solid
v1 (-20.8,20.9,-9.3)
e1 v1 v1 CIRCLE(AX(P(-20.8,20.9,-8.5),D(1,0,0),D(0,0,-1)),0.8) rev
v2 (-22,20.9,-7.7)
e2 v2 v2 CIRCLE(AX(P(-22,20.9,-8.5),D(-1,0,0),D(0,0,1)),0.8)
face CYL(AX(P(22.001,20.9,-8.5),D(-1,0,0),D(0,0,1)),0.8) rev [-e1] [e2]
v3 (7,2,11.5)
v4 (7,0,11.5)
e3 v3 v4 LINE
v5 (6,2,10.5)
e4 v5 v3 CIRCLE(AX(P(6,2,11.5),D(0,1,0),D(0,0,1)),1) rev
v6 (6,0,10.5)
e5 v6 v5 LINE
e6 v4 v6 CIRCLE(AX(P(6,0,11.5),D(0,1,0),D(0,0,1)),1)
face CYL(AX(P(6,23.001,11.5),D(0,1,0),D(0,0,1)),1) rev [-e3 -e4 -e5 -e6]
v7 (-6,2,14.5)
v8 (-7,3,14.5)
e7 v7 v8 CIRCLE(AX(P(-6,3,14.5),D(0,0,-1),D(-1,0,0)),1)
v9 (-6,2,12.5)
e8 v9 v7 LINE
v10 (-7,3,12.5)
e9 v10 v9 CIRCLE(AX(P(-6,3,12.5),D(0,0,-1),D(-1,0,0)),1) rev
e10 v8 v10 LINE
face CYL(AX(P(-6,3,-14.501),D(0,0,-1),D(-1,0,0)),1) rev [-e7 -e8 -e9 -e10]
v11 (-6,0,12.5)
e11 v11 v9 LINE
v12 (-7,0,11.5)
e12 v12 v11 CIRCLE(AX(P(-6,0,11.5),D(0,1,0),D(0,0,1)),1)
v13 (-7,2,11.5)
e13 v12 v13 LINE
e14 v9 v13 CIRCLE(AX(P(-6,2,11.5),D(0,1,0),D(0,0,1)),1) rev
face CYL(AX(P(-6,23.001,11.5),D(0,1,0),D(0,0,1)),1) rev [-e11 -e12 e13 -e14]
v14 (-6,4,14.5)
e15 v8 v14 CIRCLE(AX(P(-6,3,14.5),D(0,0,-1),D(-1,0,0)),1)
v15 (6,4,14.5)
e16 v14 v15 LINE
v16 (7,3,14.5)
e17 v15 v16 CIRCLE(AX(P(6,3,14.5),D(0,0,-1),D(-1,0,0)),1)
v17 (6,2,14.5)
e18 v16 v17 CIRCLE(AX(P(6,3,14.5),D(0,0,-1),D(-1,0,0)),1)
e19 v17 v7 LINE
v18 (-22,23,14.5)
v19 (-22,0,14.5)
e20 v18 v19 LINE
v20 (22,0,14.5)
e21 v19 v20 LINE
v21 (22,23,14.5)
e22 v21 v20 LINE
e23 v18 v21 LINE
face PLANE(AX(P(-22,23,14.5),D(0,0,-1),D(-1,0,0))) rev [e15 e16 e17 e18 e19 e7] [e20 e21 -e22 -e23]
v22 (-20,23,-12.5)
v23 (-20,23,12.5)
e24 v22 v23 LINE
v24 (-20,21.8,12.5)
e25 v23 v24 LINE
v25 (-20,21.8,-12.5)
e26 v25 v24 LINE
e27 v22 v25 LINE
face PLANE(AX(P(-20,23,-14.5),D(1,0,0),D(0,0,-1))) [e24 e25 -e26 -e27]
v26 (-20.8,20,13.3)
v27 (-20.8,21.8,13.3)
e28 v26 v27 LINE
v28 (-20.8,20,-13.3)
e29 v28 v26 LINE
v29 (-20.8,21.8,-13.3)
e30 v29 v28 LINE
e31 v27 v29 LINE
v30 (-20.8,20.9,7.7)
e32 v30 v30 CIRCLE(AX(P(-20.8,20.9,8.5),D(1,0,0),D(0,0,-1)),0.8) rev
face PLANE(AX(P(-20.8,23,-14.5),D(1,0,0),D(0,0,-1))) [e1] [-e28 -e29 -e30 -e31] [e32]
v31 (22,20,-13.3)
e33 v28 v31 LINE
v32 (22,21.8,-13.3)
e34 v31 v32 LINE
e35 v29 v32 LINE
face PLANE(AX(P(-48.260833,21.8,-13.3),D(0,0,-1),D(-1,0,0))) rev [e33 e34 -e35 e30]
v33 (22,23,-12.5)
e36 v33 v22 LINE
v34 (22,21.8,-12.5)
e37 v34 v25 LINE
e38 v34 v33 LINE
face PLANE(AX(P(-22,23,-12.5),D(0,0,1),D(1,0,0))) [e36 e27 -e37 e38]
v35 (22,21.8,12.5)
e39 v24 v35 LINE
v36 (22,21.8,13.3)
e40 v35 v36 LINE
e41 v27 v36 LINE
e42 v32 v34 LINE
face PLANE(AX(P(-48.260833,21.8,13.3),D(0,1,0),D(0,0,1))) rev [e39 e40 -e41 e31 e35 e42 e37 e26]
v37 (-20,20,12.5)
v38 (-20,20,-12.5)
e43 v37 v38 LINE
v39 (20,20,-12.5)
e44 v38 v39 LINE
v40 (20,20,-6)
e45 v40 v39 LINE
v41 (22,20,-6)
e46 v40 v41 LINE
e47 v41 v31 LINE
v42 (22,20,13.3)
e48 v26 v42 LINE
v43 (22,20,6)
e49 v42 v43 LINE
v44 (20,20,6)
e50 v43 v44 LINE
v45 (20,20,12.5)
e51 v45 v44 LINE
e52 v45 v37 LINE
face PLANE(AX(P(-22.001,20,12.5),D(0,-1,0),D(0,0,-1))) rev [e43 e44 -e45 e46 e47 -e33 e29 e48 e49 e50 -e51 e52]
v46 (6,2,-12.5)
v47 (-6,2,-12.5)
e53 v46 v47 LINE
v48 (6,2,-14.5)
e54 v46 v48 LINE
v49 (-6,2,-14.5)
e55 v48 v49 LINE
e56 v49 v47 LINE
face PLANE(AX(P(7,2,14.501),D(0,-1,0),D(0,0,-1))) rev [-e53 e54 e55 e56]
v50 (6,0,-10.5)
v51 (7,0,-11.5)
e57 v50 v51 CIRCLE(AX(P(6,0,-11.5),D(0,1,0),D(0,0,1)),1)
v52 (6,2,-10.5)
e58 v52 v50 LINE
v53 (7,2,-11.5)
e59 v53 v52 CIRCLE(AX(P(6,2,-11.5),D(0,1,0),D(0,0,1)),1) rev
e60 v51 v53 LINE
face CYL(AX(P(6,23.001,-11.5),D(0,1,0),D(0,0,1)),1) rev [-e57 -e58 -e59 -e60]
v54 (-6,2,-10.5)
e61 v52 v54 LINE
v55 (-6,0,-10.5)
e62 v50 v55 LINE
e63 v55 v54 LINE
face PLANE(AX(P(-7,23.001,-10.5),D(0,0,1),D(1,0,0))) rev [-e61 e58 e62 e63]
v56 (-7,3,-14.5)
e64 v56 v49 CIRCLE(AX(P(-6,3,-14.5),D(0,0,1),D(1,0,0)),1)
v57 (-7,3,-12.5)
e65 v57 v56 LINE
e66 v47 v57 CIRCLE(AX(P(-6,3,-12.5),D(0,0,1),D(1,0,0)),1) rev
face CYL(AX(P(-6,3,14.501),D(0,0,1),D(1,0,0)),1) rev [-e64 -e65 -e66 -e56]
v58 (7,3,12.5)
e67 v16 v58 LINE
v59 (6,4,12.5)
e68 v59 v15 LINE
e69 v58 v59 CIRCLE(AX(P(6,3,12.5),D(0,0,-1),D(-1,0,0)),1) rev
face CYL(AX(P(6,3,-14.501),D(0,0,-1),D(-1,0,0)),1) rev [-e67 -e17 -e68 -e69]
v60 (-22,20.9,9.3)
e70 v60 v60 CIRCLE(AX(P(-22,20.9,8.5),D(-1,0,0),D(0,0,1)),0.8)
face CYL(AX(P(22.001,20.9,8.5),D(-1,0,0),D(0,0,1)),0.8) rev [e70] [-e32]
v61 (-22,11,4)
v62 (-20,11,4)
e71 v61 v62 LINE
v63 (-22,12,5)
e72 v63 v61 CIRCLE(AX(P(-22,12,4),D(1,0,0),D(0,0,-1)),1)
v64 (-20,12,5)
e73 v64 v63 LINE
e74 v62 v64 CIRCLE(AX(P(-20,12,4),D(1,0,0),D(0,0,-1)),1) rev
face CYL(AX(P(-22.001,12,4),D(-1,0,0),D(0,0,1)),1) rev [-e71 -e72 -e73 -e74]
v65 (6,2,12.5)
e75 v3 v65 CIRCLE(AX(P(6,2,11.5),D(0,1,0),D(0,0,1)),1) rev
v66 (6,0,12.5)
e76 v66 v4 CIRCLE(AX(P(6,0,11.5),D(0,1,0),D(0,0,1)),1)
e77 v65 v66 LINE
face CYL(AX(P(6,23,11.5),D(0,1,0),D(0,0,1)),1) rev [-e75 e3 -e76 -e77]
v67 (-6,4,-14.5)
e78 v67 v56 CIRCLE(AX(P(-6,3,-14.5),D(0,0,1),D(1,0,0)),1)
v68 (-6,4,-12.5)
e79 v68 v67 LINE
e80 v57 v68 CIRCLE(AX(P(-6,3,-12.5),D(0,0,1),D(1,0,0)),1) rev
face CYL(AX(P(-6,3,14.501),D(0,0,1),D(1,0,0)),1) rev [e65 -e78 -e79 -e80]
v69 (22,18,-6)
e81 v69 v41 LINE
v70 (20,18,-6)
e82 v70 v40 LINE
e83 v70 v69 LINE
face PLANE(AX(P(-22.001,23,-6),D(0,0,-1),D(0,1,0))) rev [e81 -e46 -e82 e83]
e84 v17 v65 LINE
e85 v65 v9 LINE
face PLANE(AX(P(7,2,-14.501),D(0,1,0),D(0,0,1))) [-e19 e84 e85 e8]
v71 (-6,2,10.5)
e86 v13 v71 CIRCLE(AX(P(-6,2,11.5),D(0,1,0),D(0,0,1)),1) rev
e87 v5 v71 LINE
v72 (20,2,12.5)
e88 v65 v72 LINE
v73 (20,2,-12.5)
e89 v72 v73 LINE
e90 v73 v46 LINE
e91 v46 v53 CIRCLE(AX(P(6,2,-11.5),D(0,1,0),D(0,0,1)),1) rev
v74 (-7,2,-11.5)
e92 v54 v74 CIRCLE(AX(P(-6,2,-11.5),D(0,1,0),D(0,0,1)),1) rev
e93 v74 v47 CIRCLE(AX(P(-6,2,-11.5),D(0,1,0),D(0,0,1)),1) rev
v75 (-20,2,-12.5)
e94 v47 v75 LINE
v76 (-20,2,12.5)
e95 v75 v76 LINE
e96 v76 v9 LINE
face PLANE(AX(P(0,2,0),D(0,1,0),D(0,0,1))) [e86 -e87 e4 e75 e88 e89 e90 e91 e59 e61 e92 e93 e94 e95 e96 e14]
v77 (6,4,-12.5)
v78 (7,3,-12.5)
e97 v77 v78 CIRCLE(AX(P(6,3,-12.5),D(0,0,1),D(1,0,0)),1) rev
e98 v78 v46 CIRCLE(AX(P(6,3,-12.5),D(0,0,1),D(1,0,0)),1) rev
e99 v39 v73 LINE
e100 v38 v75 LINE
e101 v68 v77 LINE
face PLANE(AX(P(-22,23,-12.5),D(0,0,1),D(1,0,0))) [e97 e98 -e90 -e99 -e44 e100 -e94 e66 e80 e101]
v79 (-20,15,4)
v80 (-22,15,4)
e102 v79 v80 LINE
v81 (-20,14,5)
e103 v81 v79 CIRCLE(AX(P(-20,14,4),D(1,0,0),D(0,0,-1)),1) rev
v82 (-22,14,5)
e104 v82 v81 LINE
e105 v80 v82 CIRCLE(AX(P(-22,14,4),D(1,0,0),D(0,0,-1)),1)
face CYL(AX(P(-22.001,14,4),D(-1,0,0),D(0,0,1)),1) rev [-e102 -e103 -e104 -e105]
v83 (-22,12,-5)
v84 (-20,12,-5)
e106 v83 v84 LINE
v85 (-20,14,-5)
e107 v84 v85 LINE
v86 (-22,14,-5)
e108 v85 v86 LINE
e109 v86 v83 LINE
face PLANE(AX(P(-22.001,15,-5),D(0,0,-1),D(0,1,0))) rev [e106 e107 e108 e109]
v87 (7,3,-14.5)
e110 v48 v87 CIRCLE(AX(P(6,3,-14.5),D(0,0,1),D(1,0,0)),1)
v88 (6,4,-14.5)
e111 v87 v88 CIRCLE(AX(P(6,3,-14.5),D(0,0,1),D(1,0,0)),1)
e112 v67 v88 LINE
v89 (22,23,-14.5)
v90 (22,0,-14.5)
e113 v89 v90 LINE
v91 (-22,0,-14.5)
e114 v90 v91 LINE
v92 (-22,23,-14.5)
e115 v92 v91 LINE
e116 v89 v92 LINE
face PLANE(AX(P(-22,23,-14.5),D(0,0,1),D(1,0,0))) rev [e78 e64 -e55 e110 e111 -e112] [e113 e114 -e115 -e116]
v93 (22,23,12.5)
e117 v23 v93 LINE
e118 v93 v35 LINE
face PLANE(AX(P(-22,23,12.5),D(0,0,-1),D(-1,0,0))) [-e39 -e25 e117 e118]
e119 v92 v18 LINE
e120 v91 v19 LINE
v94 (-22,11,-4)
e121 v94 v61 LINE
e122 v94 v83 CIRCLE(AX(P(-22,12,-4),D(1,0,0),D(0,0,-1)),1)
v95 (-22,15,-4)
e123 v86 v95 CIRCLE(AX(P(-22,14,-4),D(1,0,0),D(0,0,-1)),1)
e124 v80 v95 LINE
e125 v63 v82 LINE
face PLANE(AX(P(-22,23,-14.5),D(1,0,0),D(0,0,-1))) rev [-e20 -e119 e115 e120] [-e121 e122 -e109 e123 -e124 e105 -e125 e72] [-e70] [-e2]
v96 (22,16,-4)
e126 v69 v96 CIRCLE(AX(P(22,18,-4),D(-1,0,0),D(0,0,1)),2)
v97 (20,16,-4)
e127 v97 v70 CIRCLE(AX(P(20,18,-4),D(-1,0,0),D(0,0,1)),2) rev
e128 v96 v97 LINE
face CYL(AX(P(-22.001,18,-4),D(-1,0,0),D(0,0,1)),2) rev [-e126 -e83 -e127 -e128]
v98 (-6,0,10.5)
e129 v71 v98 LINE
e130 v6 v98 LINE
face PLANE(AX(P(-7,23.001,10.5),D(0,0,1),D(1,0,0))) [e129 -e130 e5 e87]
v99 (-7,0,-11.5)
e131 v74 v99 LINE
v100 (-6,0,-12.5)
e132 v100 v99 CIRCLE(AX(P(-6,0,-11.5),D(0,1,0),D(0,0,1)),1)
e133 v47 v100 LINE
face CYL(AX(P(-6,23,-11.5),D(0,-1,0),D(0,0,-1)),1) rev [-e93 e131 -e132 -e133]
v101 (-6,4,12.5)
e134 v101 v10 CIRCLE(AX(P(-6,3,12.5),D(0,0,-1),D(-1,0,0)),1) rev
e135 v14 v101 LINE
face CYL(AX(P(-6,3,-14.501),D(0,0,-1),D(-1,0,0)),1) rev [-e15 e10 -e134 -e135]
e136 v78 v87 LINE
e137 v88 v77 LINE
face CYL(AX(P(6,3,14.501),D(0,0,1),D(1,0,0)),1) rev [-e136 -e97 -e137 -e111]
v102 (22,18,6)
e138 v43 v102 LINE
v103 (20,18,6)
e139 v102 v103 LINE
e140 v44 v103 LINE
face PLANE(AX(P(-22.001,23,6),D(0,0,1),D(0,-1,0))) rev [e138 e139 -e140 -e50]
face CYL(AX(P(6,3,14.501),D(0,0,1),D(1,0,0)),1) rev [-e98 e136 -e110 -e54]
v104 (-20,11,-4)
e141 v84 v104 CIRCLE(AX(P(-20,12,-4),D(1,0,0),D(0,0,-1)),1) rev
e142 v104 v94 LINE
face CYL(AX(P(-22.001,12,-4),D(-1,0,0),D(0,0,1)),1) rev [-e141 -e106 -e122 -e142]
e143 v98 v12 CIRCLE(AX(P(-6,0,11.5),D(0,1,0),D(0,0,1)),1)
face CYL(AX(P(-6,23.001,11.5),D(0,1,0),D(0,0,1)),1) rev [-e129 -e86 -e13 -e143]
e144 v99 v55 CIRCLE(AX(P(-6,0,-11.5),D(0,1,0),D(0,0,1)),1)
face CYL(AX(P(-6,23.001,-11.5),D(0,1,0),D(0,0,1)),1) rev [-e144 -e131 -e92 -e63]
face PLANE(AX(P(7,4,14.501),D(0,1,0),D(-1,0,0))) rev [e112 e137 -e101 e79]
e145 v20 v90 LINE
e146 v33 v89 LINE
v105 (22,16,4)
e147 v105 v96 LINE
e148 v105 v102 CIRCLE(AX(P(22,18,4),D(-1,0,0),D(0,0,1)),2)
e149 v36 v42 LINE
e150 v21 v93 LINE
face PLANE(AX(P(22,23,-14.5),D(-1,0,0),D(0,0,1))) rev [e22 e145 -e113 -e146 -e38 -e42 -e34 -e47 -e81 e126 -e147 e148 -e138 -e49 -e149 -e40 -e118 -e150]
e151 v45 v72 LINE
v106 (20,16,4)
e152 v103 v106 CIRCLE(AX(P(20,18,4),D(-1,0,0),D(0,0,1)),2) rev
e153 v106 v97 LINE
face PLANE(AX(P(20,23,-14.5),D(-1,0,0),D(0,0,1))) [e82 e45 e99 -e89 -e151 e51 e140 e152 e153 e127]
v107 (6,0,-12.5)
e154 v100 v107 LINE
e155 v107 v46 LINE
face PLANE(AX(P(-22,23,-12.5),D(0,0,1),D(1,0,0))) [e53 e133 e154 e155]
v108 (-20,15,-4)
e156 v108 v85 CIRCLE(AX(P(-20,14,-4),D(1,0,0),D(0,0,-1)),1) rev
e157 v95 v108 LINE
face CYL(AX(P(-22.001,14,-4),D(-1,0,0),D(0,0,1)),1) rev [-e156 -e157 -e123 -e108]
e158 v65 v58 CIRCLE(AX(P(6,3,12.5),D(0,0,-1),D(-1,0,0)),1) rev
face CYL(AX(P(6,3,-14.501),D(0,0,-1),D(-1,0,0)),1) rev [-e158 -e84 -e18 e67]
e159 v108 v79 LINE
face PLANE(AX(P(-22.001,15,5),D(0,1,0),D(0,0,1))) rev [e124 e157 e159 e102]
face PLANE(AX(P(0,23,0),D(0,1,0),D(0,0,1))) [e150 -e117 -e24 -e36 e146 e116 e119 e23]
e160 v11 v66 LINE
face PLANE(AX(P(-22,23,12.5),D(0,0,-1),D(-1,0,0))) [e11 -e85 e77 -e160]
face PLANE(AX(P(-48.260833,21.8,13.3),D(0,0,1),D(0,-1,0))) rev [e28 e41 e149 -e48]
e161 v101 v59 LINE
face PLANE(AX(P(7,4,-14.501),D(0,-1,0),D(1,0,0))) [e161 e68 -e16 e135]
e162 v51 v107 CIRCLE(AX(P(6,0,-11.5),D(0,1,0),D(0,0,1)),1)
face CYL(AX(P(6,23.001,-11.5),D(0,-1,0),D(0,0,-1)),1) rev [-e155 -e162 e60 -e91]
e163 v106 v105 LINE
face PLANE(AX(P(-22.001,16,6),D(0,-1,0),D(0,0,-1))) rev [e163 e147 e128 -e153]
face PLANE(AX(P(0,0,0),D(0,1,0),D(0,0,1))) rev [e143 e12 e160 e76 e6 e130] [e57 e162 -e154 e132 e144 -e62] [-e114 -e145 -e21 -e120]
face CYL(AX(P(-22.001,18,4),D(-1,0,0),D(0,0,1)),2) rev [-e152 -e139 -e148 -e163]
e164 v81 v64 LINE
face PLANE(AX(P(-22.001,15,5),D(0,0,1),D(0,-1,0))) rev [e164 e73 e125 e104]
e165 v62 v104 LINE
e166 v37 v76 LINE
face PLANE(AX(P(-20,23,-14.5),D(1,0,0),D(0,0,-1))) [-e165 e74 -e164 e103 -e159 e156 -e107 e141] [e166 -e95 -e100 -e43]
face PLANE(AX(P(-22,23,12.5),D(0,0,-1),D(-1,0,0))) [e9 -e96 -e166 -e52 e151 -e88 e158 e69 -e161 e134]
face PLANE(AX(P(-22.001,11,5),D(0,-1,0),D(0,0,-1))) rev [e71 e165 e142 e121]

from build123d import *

# Parameters (mm, degrees)
SKETCH_1_W             = 44
SKETCH_1_H             = 29
EXTRUDE_1_DEPTH        = 23
SHELL_1_T              = -2
CUT_EXTRUDE_1_REACH    = 53.723
SKETCH_2_W             = 12
SKETCH_2_H             = 7
CUT_EXTRUDE_2_REACH    = 52.032
SKETCH_3_W             = 10
SKETCH_3_H             = 4
FILLET_1_R             = 1
FILLET_2_R             = 2
CUT_EXTRUDE_START      = -2
SKETCH_4_W             = 25
SKETCH_4_H             = 3
CUT_EXTRUDE_3_DEPTH    = 2
SKETCH_5_W             = 26.6
SKETCH_5_H             = 1.8
CUT_EXTRUDE_4_DEPTH    = 42.8
CUT_EXTRUDE_5_REACH    = 53.723
SKETCH_6_R             = 0.8
CUT_EXTRUDE_6_REACH    = 36.975
SKETCH_8_W             = 14
SKETCH_8_H             = 2
CUT_EXTRUDE_7_REACH    = 45.058
SKETCH_9_W             = 14
SKETCH_9_H             = 2
FILLET_3_R             = 1
FILLET_4_R             = 1
FILLET_3_OF_MIRROR_1_R = 1
FILLET_4_OF_MIRROR_1_R = 1


# Some blends are built 0.0001 mm under size
with BuildPart() as part:
    # 草图1 → 凸台-拉伸1 (new body)
    with BuildSketch(Plane(origin=(0, 0, 0), x_dir=(1, 0, 0), z_dir=(0, 1, 0))):
        Rectangle(SKETCH_1_W, SKETCH_1_H)
    extrude(amount=EXTRUDE_1_DEPTH)

    # 抽壳1
    shell_1_openings = [part.faces().sort_by_distance(p)[0] for p in [
        (0, 23, 0),
    ]]
    offset(amount=SHELL_1_T, openings=shell_1_openings, kind=Kind.INTERSECTION)

    # 草图2 → 切除-拉伸1 (cut, up to next)
    with BuildSketch(Plane(origin=(22, 0, 0), x_dir=(0, 0, -1), z_dir=(1, 0, 0)), mode=Mode.PRIVATE) as cut_extrude_1_sk1:
        with Locations((0, 19.5)):
            Rectangle(SKETCH_2_W, SKETCH_2_H)
    cut_extrude_1_tool1 = extrude(cut_extrude_1_sk1.sketch, amount=-CUT_EXTRUDE_1_REACH, mode=Mode.PRIVATE) & part.part
    add(cut_extrude_1_tool1.solids().sort_by_distance((22, 19.5, 0))[0], mode=Mode.SUBTRACT)

    # 草图3 → 切除-拉伸2 (cut, up to next)
    with BuildSketch(Plane(origin=(-20, 0, 0), x_dir=(0, 0, -1), z_dir=(1, 0, 0)), mode=Mode.PRIVATE) as cut_extrude_2_sk1:
        with Locations((0, 13)):
            Rectangle(SKETCH_3_W, SKETCH_3_H)
    cut_extrude_2_tool1 = extrude(cut_extrude_2_sk1.sketch, amount=-CUT_EXTRUDE_2_REACH, mode=Mode.PRIVATE) & part.part
    add(cut_extrude_2_tool1.solids().sort_by_distance((-20, 13, 0))[0], mode=Mode.SUBTRACT)

    # 圆角1
    fillet_1_edges = [part.edges().sort_by_distance(p)[0] for p in [
        (-21, 11, 5),
        (-21, 15, 5),
        (-21, 15, -5),
        (-21, 11, -5),
    ]]
    fillet(fillet_1_edges, radius=FILLET_1_R)

    # 圆角2
    fillet_2_edges = [part.edges().sort_by_distance(p)[0] for p in [
        (21, 16, 6),
        (21, 16, -6),
    ]]
    fillet(fillet_2_edges, radius=FILLET_2_R)

    # 草图4 → 切除-拉伸3 (cut)
    with BuildSketch(Plane(origin=(22, 0, 0), x_dir=(0, 0, -1), z_dir=(1, 0, 0)).offset(CUT_EXTRUDE_START)):
        with Locations((0, 21.5)):
            Rectangle(SKETCH_4_W, SKETCH_4_H)
    extrude(amount=CUT_EXTRUDE_3_DEPTH, mode=Mode.SUBTRACT)

    # 草图5 → 切除-拉伸4 (cut)
    with BuildSketch(Plane(origin=(22, 0, 0), x_dir=(0, 0, -1), z_dir=(1, 0, 0))):
        with Locations((0, 20.9)):
            Rectangle(SKETCH_5_W, SKETCH_5_H)
    extrude(amount=-CUT_EXTRUDE_4_DEPTH, mode=Mode.SUBTRACT)

    # 草图6 → 切除-拉伸5 (cut, up to next)
    with BuildSketch(Plane.ZY.offset(22), mode=Mode.PRIVATE) as cut_extrude_5_sk1:
        with Locations((-8.5, 20.9)):
            Circle(SKETCH_6_R)
    cut_extrude_5_tool1 = extrude(cut_extrude_5_sk1.sketch, amount=-CUT_EXTRUDE_5_REACH, mode=Mode.PRIVATE) & part.part
    # 草图6 → 切除-拉伸5 (cut, up to next)
    with BuildSketch(Plane.ZY.offset(22), mode=Mode.PRIVATE) as cut_extrude_5_sk2:
        with Locations((8.5, 20.9)):
            Circle(SKETCH_6_R)
    cut_extrude_5_tool2 = extrude(cut_extrude_5_sk2.sketch, amount=-CUT_EXTRUDE_5_REACH, mode=Mode.PRIVATE) & part.part
    add(cut_extrude_5_tool1.solids().sort_by_distance((-22, 20.9, -8.5))[0], mode=Mode.SUBTRACT)
    add(cut_extrude_5_tool2.solids().sort_by_distance((-22, 20.9, 8.5))[0], mode=Mode.SUBTRACT)

    # 草图8 → 切除-拉伸6 (cut, up to next)
    with BuildSketch(Plane.XZ, mode=Mode.PRIVATE) as cut_extrude_6_sk1:
        with Locations((0, -11.5)):
            Rectangle(SKETCH_8_W, SKETCH_8_H)
    cut_extrude_6_tool1 = extrude(cut_extrude_6_sk1.sketch, amount=-CUT_EXTRUDE_6_REACH, mode=Mode.PRIVATE) & part.part
    cut_extrude_6 = cut_extrude_6_tool1.solids().sort_by_distance((0, 0, -11.5))[0]
    add(cut_extrude_6, mode=Mode.SUBTRACT)

    # 草图9 → 切除-拉伸7 (cut, up to next)
    with BuildSketch(Plane(origin=(0, 0, -14.5), x_dir=(-1, 0, 0), z_dir=(0, 0, -1)), mode=Mode.PRIVATE) as cut_extrude_7_sk1:
        with Locations((0, 3)):
            Rectangle(SKETCH_9_W, SKETCH_9_H)
    cut_extrude_7_tool1 = extrude(cut_extrude_7_sk1.sketch, amount=-CUT_EXTRUDE_7_REACH, mode=Mode.PRIVATE) & part.part
    cut_extrude_7 = cut_extrude_7_tool1.solids().sort_by_distance((0, 3, -14.5))[0]
    add(cut_extrude_7, mode=Mode.SUBTRACT)

    # 圆角3
    # the kernel refuses this fillet: 1 mm, written as the material it adds along each edge
    with BuildSketch(Plane(origin=(-7, 4, -14.5), x_dir=(0, -1, 0), z_dir=(0, 0, 1)), Plane(origin=(-7, 2, -14.5), x_dir=(1, 0, 0), z_dir=(0, 0, 1)), Plane(origin=(7, 2, -14.5), x_dir=(0, 1, 0), z_dir=(0, 0, 1))) as fillet_3_piece_1:
        with BuildLine():
            CenterArc((FILLET_3_R, FILLET_3_R), FILLET_3_R, 180, 90)
            Line((0, FILLET_3_R), (0, 0))
            Line((0, 0), (FILLET_3_R, 0))
        make_face()
    extrude(amount=2)
    with BuildSketch(Plane(origin=(7, 4, -14.5), x_dir=(0, -1, 0), z_dir=(0, 0, 1))) as fillet_3_piece_2:
        with BuildLine():
            CenterArc((FILLET_3_R, -FILLET_3_R), FILLET_3_R, 90, 90)
            Line((0, -FILLET_3_R), (0, 0))
            Line((0, 0), (FILLET_3_R, 0))
        make_face()
    extrude(amount=2)

    # 圆角4
    fillet_4_edges = [part.edges().sort_by_distance(p)[0] for p in [
        (-7, 1, -12.5),
        (-7, 1, -10.5),
        (7, 1, -12.5),
        (7, 1, -10.5),
    ]]
    fillet(fillet_4_edges, radius=FILLET_4_R - 0.0001)  # a hair under: the kernel refuses the full size

    # 镜向1: 切除-拉伸6, 切除-拉伸7 across plane
    add(cut_extrude_6.mirror(Plane.XY), mode=Mode.SUBTRACT)
    add(cut_extrude_7.mirror(Plane.XY), mode=Mode.SUBTRACT)

    # 圆角3 of 镜向1
    # the kernel refuses this fillet: 1 mm, written as the material it adds along each edge
    with BuildSketch(Plane(origin=(-7, 4, 14.5), x_dir=(1, 0, 0), z_dir=(0, 0, -1)), Plane(origin=(-7, 2, 14.5), x_dir=(0, 1, 0), z_dir=(0, 0, -1)), Plane(origin=(7, 2, 14.5), x_dir=(-1, 0, 0), z_dir=(0, 0, -1))) as fillet_3_of_mirror_1_piece_1:
        with BuildLine():
            CenterArc((FILLET_3_OF_MIRROR_1_R, FILLET_3_OF_MIRROR_1_R), FILLET_3_OF_MIRROR_1_R, 180, 90)
            Line((0, FILLET_3_OF_MIRROR_1_R), (0, 0))
            Line((0, 0), (FILLET_3_OF_MIRROR_1_R, 0))
        make_face()
    extrude(amount=2)
    with BuildSketch(Plane(origin=(7, 4, 14.5), x_dir=(-1, 0, 0), z_dir=(0, 0, -1))) as fillet_3_of_mirror_1_piece_2:
        with BuildLine():
            CenterArc((FILLET_3_OF_MIRROR_1_R, -FILLET_3_OF_MIRROR_1_R), FILLET_3_OF_MIRROR_1_R, 90, 90)
            Line((0, -FILLET_3_OF_MIRROR_1_R), (0, 0))
            Line((0, 0), (FILLET_3_OF_MIRROR_1_R, 0))
        make_face()
    extrude(amount=2)

    # 圆角4 of 镜向1
    fillet_4_of_mirror_1_edges = [part.edges().sort_by_distance(p)[0] for p in [
        (-7, 1, 12.5),
        (-7, 1, 10.5),
        (7, 1, 12.5),
        (7, 1, 10.5),
    ]]
    fillet(fillet_4_of_mirror_1_edges, radius=FILLET_4_OF_MIRROR_1_R - 0.0001)  # a hair under: the kernel refuses the full size


solid = part.part
